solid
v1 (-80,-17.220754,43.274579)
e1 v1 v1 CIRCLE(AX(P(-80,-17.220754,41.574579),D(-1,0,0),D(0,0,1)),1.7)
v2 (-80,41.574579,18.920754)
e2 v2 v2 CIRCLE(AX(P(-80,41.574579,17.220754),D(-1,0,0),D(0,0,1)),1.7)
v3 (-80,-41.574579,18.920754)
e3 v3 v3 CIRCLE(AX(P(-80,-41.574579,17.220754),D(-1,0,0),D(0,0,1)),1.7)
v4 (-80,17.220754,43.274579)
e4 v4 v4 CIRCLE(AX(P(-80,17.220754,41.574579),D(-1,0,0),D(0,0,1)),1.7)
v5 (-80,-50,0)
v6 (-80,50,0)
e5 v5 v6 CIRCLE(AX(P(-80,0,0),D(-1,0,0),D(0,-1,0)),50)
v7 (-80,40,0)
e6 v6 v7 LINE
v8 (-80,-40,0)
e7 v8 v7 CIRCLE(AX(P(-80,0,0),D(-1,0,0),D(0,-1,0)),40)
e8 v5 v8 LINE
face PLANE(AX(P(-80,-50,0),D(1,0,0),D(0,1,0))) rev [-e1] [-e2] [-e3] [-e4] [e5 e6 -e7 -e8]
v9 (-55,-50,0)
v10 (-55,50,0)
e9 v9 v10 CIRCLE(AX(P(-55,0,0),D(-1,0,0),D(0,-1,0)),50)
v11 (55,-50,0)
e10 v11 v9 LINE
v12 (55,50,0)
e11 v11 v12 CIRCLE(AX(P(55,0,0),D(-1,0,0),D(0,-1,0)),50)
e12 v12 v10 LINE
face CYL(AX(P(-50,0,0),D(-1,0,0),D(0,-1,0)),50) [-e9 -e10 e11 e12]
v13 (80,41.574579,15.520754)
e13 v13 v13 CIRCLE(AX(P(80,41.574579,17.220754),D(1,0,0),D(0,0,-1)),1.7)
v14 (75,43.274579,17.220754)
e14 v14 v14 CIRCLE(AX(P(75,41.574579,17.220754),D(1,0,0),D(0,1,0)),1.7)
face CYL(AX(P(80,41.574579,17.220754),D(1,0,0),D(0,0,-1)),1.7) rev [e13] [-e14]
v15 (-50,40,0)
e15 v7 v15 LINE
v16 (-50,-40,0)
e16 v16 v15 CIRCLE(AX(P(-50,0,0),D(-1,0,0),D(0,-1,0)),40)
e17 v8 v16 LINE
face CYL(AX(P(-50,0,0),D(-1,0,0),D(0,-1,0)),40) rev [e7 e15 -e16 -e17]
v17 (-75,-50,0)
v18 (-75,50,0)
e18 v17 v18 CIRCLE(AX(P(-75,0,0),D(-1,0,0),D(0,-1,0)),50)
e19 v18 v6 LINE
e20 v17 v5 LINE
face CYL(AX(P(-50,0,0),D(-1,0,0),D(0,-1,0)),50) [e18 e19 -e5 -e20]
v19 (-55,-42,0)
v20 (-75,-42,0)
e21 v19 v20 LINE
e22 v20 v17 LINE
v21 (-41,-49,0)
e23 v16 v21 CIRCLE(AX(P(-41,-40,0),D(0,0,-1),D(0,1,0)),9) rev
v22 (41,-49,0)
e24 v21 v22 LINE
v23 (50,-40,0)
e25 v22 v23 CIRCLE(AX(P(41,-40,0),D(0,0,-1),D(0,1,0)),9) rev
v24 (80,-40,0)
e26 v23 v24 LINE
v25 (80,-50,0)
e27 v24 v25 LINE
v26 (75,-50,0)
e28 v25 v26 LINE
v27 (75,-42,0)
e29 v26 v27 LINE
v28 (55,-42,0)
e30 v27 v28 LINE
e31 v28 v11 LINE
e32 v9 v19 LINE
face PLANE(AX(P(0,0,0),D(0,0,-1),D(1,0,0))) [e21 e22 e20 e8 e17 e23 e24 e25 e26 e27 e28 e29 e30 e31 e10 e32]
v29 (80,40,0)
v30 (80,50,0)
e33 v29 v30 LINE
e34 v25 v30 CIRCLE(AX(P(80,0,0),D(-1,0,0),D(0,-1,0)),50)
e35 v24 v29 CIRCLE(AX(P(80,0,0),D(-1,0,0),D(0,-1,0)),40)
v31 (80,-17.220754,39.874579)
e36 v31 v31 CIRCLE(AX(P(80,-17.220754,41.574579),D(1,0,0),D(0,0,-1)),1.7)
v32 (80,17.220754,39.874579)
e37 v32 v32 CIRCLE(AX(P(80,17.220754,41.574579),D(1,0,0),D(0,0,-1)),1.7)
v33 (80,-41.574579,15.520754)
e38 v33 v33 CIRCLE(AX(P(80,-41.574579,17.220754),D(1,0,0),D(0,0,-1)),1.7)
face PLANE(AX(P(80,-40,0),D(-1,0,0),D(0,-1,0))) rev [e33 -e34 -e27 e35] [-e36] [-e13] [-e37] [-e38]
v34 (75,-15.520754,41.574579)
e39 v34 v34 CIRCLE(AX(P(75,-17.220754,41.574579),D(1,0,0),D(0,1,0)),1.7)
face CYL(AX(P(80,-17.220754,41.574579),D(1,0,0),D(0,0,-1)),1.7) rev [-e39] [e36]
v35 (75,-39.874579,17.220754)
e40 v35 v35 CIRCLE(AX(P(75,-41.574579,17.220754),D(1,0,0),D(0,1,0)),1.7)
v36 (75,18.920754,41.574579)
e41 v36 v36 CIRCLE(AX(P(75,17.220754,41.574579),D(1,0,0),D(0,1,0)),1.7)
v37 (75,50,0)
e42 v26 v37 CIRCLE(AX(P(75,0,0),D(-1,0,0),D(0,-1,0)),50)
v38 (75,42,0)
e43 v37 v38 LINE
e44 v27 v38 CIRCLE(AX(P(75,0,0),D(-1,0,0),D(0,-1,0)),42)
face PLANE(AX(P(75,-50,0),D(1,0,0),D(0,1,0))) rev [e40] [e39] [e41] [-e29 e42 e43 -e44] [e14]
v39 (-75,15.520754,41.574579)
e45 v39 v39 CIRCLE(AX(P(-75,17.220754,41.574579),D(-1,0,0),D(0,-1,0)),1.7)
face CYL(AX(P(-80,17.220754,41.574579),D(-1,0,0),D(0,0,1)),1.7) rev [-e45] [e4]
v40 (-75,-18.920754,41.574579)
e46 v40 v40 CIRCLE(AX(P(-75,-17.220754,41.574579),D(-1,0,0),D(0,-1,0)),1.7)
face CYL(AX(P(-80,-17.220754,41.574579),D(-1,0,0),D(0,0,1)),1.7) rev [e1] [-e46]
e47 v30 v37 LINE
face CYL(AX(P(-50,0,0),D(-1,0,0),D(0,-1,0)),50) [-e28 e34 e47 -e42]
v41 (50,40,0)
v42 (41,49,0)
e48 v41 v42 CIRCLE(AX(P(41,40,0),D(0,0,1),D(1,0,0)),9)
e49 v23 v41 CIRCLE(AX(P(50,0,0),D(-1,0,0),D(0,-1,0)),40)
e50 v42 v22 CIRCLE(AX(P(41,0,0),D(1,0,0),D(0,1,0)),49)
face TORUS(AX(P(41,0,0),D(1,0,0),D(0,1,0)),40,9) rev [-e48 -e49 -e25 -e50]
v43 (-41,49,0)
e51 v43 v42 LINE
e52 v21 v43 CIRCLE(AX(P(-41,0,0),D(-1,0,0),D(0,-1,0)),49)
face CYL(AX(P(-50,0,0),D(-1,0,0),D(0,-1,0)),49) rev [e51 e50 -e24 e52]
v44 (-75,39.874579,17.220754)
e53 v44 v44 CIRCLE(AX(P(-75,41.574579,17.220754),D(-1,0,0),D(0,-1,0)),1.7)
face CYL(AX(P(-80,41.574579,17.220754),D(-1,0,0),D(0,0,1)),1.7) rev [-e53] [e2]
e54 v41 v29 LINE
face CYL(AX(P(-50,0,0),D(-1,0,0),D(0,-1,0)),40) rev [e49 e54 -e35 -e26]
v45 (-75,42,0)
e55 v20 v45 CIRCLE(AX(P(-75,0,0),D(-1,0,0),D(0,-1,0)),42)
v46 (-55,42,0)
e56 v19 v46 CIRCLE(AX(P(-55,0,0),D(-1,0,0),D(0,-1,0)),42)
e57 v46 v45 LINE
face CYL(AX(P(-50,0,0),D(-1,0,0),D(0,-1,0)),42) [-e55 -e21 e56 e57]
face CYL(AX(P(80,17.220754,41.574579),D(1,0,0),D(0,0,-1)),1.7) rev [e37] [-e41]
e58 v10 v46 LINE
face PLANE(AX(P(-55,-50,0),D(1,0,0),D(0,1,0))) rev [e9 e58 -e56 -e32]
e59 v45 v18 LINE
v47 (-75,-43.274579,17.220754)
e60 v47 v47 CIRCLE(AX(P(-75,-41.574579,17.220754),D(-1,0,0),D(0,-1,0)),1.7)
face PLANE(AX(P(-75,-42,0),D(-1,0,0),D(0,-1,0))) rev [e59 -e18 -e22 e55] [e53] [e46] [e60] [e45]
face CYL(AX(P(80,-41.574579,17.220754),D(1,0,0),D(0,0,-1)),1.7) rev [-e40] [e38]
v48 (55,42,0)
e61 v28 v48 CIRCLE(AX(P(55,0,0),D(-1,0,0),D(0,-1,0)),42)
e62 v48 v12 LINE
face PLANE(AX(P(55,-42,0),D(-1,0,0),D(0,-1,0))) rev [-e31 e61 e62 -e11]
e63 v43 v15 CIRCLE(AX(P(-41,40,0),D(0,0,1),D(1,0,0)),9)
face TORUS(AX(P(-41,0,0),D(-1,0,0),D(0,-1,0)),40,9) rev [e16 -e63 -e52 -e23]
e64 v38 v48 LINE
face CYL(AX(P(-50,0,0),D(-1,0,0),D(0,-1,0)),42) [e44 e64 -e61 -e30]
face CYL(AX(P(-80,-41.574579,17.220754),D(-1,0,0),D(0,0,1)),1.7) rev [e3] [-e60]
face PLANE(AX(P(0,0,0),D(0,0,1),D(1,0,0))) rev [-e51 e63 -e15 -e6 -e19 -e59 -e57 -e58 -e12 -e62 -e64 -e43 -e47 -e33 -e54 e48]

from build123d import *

# Parameters (mm, degrees)
REVOLVE_1_ANGLE          = 180
HOLE_WIZARD_M3_1_D       = 3.4
HOLE_WIZARD_M3_1_DEPTH   = 5
PATTERN_CIRCULAR_1_COUNT = 4
PATTERN_CIRCULAR_1_ANGLE = 135
MIRROR_1_COPY_1_D        = 3.4
MIRROR_1_COPY_1_DEPTH    = 5
MIRROR_1_COPY_2_D        = 3.4
MIRROR_1_COPY_2_DEPTH    = 5
MIRROR_1_COPY_3_D        = 3.4
MIRROR_1_COPY_3_DEPTH    = 5
FILLET_1_R               = 9


with BuildPart() as part:
    # ｽｹｯﾁ1 → 回転1 (revolve)
    with BuildSketch(Plane.XY):
        Polygon((-80, 40), (-50, 40), (-50, 49), (50, 49), (50, 40), (80, 40), (80, 50), (75, 50), (75, 42), (55, 42), (55, 50), (-55, 50), (-55, 42), (-75, 42), (-75, 50), (-80, 50), align=None)
    revolve(axis=Axis((-50, 0, 0), (1, 0, 0)), revolution_arc=REVOLVE_1_ANGLE)

    # M3 すきま穴1
    with Locations(Plane.ZY.offset(80)):
        with Locations((17.220754456, -41.574578963)):
            hole_wizard_m3_1 = Hole(HOLE_WIZARD_M3_1_D / 2, depth=HOLE_WIZARD_M3_1_DEPTH)

    # 円形ﾊﾟﾀｰﾝ1: M3 すきま穴1 ×4 about axis
    pattern_circular_1_axis = Axis((0, 0, 0), (-1, 0, 0))
    for i in range(1, PATTERN_CIRCULAR_1_COUNT):
        add(hole_wizard_m3_1.rotate(pattern_circular_1_axis, i * PATTERN_CIRCULAR_1_ANGLE / (PATTERN_CIRCULAR_1_COUNT - 1)), mode=Mode.SUBTRACT)

    # ﾐﾗｰ1: M3 すきま穴1 across plane
    add(hole_wizard_m3_1.mirror(Plane(origin=(0, 0, 0), x_dir=(0, 0, 1), z_dir=(1, 0, 0))), mode=Mode.SUBTRACT)

    # ﾐﾗｰ1 copy 1
    with Locations(Plane(origin=(80, 0, 0), x_dir=(0, 0.7071067811865487, 0.7071067811865464), z_dir=(1, 0, 0))):
        with Locations((17.220754456, 41.574578963)):
            Hole(MIRROR_1_COPY_1_D / 2, depth=MIRROR_1_COPY_1_DEPTH)

    # ﾐﾗｰ1 copy 2
    with Locations(Plane.YZ.offset(80)):
        with Locations((17.220754456, 41.574578963)):
            Hole(MIRROR_1_COPY_2_D / 2, depth=MIRROR_1_COPY_2_DEPTH)

    # ﾐﾗｰ1 copy 3
    with Locations(Plane(origin=(80, 0, 0), x_dir=(0, 0.7071067811865441, -0.7071067811865509), z_dir=(1, 0, 0))):
        with Locations((17.220754456, 41.574578963)):
            Hole(MIRROR_1_COPY_3_D / 2, depth=MIRROR_1_COPY_3_DEPTH)

    # ﾌｨﾚｯﾄ1
    fillet_1_edges = [part.edges().sort_by_distance(p)[0] for p in [
        (-50, 0, 49),
        (50, 0, 49),
    ]]
    fillet(fillet_1_edges, radius=FILLET_1_R - 0.0001)  # a hair under: the kernel refuses the full size


solid = part.part
